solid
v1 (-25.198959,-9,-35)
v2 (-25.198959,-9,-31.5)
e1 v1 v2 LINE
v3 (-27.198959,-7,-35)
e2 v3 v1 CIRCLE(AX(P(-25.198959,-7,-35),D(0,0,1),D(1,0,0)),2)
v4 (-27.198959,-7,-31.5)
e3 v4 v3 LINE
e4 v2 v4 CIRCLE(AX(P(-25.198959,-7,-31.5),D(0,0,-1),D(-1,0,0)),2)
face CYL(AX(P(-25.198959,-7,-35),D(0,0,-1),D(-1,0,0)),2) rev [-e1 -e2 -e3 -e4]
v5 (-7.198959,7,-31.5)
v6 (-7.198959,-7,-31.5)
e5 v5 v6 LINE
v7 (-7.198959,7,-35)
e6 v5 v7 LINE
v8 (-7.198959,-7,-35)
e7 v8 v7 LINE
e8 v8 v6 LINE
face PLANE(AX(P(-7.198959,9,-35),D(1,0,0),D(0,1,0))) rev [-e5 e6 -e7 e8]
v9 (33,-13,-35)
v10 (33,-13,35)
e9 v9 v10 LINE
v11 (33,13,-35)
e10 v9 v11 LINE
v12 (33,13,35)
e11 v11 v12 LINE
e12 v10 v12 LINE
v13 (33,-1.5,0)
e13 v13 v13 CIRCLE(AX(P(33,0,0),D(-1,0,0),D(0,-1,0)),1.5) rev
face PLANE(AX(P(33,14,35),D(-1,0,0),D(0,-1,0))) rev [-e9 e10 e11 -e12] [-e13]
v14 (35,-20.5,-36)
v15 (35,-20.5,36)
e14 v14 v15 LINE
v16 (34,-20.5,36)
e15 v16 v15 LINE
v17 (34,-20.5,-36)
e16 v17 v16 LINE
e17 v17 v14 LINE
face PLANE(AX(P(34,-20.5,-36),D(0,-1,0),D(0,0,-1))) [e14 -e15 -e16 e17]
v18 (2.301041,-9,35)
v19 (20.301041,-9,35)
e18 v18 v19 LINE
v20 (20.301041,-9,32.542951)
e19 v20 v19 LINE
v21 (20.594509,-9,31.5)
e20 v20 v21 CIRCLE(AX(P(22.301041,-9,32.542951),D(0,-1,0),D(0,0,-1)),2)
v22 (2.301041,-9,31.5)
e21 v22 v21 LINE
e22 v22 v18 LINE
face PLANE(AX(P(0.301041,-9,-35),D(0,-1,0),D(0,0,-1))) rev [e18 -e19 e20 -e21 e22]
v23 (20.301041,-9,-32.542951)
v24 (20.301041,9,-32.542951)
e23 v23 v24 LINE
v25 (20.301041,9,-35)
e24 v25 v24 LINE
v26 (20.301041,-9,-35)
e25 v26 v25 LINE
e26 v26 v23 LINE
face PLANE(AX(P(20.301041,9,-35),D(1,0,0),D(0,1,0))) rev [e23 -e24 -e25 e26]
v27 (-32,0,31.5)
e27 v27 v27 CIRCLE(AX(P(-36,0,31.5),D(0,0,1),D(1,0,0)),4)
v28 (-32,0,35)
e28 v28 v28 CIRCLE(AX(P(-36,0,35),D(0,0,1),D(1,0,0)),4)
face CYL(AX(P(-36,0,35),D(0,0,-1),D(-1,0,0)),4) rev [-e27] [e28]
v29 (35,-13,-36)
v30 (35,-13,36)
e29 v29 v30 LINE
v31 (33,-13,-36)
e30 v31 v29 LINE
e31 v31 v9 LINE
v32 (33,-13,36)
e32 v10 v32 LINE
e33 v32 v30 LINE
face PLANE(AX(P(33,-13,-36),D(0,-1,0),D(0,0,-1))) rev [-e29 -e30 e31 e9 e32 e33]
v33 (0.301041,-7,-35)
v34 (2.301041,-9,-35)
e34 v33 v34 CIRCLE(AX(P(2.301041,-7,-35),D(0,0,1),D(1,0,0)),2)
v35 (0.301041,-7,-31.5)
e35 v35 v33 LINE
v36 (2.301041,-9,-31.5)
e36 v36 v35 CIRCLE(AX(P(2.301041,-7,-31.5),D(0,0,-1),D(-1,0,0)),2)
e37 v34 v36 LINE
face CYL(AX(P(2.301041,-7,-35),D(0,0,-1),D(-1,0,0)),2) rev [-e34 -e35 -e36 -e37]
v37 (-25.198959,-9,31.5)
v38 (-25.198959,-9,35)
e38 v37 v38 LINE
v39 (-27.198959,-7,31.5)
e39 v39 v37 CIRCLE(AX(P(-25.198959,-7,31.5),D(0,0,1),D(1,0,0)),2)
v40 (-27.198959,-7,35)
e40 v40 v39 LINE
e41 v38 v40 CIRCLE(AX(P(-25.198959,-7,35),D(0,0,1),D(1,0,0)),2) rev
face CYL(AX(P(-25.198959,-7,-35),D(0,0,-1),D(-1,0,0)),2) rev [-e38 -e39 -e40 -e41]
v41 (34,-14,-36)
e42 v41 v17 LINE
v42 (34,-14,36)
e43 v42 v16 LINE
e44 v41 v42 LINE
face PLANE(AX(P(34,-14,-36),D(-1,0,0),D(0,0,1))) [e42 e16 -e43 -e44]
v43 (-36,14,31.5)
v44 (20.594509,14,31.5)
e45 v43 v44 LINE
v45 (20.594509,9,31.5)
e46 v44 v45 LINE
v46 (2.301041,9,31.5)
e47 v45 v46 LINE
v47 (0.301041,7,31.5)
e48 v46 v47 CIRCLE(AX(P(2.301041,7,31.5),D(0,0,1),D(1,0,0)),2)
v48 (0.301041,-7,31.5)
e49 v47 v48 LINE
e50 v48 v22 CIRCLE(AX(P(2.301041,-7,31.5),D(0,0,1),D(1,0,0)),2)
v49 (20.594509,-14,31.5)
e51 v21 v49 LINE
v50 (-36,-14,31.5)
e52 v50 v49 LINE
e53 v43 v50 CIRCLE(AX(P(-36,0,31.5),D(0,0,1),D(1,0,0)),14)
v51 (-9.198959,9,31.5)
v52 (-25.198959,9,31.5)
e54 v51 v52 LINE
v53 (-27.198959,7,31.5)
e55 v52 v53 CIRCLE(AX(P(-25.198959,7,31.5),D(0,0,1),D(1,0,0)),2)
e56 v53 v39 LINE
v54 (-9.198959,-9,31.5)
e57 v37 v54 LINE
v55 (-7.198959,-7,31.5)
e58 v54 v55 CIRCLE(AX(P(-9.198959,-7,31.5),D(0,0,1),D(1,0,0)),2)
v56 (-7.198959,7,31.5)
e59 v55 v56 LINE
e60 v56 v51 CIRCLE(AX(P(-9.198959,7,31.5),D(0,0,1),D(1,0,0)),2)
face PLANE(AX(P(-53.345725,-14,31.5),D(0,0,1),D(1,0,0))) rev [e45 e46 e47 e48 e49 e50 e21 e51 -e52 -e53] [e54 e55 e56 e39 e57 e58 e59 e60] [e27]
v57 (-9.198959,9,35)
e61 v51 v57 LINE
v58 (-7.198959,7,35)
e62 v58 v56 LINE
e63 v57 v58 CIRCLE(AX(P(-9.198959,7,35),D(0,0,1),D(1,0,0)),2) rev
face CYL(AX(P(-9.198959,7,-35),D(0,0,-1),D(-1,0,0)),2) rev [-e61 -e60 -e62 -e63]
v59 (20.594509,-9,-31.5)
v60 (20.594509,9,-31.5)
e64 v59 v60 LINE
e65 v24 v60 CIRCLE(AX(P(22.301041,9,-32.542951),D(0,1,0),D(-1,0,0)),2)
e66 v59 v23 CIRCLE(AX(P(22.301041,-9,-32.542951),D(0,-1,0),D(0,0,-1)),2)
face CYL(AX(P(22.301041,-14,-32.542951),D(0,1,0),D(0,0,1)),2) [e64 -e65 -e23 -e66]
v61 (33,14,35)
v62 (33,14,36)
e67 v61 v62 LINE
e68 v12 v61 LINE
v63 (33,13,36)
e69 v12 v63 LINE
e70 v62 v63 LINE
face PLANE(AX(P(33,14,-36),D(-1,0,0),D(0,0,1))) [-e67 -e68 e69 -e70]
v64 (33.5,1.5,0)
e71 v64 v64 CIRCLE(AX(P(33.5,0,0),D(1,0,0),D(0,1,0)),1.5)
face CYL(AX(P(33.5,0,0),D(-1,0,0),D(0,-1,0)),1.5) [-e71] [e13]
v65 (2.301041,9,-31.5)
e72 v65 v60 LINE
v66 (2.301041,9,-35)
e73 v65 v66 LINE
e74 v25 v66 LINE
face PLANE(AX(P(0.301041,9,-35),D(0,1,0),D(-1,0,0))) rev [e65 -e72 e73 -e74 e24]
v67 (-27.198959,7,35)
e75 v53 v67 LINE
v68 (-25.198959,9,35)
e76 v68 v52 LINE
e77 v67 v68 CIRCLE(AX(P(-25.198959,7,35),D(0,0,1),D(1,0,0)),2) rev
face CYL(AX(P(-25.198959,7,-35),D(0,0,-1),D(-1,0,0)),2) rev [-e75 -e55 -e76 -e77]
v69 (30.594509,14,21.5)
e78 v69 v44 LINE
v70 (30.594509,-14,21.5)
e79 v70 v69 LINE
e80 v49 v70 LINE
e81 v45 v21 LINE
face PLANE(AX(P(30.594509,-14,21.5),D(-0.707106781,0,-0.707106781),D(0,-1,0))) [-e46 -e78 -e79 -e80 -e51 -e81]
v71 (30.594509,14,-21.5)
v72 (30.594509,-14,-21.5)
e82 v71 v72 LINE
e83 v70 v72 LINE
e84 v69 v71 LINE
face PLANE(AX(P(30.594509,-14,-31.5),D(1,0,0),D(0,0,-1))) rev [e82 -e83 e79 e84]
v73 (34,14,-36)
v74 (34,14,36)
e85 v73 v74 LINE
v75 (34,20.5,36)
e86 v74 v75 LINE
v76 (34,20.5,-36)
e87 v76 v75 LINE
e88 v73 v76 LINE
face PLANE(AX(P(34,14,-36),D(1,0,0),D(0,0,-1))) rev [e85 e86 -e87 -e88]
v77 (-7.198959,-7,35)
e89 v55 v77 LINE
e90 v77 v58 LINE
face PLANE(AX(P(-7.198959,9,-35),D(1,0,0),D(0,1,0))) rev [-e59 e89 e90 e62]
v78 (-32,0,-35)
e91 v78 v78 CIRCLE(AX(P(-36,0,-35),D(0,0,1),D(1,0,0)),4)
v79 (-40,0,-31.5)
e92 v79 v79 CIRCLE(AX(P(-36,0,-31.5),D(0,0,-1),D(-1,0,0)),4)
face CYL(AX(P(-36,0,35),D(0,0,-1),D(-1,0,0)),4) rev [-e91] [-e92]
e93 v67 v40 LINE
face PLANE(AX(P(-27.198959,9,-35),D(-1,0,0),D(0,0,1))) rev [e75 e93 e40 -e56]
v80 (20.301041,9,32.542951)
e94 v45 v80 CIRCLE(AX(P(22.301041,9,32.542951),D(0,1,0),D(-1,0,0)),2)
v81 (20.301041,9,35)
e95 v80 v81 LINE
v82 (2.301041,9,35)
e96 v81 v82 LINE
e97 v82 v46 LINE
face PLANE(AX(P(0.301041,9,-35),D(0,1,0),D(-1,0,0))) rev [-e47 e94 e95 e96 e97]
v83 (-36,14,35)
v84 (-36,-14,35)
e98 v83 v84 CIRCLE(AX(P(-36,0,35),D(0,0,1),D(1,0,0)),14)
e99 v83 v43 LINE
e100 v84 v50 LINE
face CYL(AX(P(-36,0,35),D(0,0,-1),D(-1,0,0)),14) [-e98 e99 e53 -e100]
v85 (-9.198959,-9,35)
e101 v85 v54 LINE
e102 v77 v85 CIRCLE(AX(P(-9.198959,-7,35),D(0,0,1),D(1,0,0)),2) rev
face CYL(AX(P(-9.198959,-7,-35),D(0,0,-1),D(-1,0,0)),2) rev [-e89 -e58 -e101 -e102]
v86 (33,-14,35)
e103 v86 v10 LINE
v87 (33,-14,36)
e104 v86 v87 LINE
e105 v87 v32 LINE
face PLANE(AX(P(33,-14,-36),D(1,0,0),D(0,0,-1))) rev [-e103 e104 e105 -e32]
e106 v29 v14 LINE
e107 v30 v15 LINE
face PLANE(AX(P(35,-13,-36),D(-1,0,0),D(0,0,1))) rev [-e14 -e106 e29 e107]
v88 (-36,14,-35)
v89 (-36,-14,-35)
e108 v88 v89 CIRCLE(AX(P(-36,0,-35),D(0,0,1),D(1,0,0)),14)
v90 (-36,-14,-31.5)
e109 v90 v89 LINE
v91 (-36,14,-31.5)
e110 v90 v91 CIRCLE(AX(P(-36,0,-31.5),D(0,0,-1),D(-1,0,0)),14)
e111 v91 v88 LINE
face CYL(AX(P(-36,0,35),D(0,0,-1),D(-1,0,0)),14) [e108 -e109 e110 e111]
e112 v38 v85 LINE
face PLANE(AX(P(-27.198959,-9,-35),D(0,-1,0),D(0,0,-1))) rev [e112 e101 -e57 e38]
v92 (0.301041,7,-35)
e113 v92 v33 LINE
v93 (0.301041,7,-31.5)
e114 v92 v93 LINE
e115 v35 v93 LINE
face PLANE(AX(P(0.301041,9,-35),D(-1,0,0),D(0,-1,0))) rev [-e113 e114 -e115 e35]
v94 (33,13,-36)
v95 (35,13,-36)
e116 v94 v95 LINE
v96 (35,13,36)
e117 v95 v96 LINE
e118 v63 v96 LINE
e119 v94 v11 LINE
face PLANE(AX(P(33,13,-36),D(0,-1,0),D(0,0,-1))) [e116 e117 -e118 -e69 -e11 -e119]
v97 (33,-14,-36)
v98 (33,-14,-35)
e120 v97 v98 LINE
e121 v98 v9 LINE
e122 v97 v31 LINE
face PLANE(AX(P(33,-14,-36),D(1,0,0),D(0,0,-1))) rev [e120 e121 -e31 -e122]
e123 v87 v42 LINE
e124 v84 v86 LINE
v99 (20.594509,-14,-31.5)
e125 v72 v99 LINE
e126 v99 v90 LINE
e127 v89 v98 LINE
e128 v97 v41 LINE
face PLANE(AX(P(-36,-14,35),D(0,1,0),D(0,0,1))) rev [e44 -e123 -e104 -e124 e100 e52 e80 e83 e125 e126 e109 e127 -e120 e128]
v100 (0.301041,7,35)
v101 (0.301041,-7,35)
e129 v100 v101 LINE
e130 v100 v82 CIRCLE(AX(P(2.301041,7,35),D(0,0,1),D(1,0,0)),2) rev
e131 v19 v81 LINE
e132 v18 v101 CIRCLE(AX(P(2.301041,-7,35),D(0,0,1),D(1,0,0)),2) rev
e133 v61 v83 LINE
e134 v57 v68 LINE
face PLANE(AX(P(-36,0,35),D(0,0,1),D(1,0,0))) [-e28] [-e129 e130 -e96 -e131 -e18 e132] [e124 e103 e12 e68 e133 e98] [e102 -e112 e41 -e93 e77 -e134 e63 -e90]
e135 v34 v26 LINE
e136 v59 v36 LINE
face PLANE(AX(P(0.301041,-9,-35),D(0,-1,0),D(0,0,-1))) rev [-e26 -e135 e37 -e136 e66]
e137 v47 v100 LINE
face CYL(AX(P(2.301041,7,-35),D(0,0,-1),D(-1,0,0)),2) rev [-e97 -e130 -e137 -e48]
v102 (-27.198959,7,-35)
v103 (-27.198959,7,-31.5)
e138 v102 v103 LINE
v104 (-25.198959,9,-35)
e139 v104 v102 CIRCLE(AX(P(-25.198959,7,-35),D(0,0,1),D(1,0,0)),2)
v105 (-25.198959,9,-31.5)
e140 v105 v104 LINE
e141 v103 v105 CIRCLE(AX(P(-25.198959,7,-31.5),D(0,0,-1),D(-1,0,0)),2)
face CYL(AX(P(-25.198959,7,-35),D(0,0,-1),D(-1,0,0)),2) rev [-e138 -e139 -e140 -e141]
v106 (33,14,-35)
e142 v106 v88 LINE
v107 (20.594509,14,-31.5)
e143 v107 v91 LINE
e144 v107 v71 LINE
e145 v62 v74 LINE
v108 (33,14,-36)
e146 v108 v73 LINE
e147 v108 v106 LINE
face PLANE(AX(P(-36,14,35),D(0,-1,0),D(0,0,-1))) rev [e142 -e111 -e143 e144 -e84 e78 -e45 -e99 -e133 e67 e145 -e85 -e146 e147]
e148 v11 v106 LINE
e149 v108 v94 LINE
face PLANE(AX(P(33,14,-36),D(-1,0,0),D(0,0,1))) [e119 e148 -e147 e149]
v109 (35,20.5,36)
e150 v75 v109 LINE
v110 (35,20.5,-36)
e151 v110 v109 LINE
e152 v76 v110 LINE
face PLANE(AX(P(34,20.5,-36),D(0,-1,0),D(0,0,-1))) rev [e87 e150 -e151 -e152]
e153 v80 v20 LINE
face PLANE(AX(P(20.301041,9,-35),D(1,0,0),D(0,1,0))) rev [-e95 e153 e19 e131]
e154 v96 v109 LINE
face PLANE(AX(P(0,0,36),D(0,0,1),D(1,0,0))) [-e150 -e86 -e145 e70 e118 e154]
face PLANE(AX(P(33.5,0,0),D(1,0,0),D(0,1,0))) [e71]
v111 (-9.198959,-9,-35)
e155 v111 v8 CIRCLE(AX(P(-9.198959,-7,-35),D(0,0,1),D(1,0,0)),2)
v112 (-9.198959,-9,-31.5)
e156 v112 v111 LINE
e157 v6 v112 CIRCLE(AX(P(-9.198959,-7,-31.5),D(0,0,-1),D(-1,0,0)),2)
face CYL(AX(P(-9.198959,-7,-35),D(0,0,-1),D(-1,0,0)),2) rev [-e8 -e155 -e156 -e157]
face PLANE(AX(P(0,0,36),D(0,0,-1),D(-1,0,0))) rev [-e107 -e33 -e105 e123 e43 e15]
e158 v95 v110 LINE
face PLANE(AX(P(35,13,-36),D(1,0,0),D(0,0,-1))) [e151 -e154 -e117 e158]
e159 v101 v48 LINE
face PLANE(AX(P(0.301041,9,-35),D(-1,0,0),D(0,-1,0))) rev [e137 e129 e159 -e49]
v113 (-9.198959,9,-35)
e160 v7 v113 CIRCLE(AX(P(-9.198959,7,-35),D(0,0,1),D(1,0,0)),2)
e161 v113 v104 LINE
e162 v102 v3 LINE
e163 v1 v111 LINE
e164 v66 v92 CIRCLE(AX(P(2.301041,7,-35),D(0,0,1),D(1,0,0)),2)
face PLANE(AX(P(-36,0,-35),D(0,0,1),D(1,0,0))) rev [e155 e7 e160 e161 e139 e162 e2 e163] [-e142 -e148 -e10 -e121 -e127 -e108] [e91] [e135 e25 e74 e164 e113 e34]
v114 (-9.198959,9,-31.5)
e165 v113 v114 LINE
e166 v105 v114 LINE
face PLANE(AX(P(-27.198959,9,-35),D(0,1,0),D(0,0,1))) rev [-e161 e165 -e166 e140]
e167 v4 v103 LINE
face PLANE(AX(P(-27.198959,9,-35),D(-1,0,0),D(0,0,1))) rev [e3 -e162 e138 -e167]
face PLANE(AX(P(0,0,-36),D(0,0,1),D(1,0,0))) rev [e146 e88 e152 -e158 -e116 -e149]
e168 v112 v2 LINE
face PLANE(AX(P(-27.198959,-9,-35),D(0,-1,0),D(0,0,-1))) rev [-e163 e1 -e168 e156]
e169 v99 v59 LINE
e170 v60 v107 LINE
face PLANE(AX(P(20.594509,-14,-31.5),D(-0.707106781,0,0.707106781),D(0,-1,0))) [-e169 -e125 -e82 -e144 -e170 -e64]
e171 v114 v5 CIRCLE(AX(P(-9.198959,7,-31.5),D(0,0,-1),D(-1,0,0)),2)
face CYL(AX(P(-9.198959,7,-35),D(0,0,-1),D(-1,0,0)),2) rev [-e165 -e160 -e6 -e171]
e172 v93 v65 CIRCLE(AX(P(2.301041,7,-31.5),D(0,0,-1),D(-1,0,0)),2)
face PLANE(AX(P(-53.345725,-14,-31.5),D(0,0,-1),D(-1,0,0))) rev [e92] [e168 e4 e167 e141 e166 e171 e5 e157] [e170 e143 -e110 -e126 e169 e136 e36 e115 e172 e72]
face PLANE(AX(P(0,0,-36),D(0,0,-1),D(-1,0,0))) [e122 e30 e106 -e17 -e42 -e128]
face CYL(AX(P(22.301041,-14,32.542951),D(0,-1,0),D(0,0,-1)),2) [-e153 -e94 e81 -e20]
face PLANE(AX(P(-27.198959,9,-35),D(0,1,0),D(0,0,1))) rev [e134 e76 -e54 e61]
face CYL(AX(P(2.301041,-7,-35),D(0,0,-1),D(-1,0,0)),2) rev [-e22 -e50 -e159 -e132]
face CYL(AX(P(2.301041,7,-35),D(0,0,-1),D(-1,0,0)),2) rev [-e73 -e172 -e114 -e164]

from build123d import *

# Parameters (mm, degrees)
SKETCH1_R           = 4
BOSS_EXTRUDE1_DEPTH = 35
SKETCH3_W           = 44.253465858
SKETCH3_H           = 32.381458222
CUT_EXTRUDE1_DEPTH  = 27.5
SKETCH4_W           = 83.940233782
SKETCH4_H           = 63
CUT_EXTRUDE2_DEPTH  = 68.149087857
CHAMFER1_SIZE       = 10
SKETCH7_W           = 20
SKETCH7_H           = 18
CUT_EXTRUDE3_DEPTH  = 88.155034278
FILLET2_R           = 2
BOSS_EXTRUDE4_START = 1
BOSS_EXTRUDE4_DEPTH = 72
SKETCH11_R          = 1.5
BOSS_EXTRUDE5_DEPTH = 0.5


with BuildPart() as part:
    # Sketch1 → Boss-Extrude1 (new, symmetric)
    with BuildSketch(Plane.XY):
        with BuildLine():
            Line((-36, 14), (33, 14))
            Line((33, 14), (33, -14))
            Line((33, -14), (-36, -14))
            ThreePointArc((-36, -14), (-50, 0), (-36, 14))
        make_face()
        with Locations((-36, 0)):
            Circle(SKETCH1_R, mode=Mode.SUBTRACT)
    extrude(amount=BOSS_EXTRUDE1_DEPTH, both=True)

    # Sketch3 → Cut-Extrude1 (cut, symmetric)
    with BuildSketch(Plane.XY):
        with Locations((-36, 0)):
            Rectangle(SKETCH3_W, SKETCH3_H)
    extrude(amount=CUT_EXTRUDE1_DEPTH, both=True, mode=Mode.SUBTRACT)

    # Sketch4 → Cut-Extrude2 (cut, through all)
    with BuildSketch(Plane(origin=(0, 14, 0), x_dir=(1, 0, 0), z_dir=(0, 1, 0))):
        with Locations((-11.375607931, 0)):
            Rectangle(SKETCH4_W, SKETCH4_H)
    extrude(amount=-CUT_EXTRUDE2_DEPTH, mode=Mode.SUBTRACT)

    # Chamfer1
    chamfer1_edges = [part.edges().sort_by_distance(p)[0] for p in [
        (30.59450896, 0, 31.5),
        (30.59450896, 0, -31.5),
    ]]
    chamfer(chamfer1_edges, length=CHAMFER1_SIZE)

    # Sketch7 → Cut-Extrude3 (cut, through all)
    with BuildSketch(Plane.XY.offset(35)):
        with Locations((-17.198958596, 0)):
            Rectangle(SKETCH7_W, SKETCH7_H)
        with Locations((10.301041404, 0)):
            Rectangle(SKETCH7_W, SKETCH7_H)
    extrude(amount=-CUT_EXTRUDE3_DEPTH, mode=Mode.SUBTRACT)

    # Fillet2
    # the kernel refuses this fillet: 2 mm, written as the material it adds along each edge
    with BuildSketch(Plane(origin=(-27.198958596, -9, -31.5), x_dir=(0, 1, 0), z_dir=(0, 0, -1)), Plane(origin=(-7.198958596, 9, -31.5), x_dir=(0, -1, 0), z_dir=(0, 0, -1)), Plane(origin=(-7.198958596, 9, 35), x_dir=(0, -1, 0), z_dir=(0, 0, -1)), Plane(origin=(-7.198958596, -9, -31.5), x_dir=(-1, 0, 0), z_dir=(0, 0, -1)), Plane(origin=(0.301041404, -9, -31.5), x_dir=(0, 1, 0), z_dir=(0, 0, -1))) as fillet2_piece_1:
        with BuildLine():
            CenterArc((FILLET2_R, FILLET2_R), FILLET2_R, 180, 90)
            Line((0, FILLET2_R), (0, 0))
            Line((0, 0), (FILLET2_R, 0))
        make_face()
    extrude(amount=3.5)
    with BuildSketch(Plane(origin=(-27.198958596, -9, 35), x_dir=(1, 0, 0), z_dir=(0, 0, -1)), Plane(origin=(-27.198958596, 9, -31.5), x_dir=(0, -1, 0), z_dir=(0, 0, -1)), Plane(origin=(-27.198958596, 9, 35), x_dir=(0, -1, 0), z_dir=(0, 0, -1)), Plane(origin=(-7.198958596, -9, 35), x_dir=(0, 1, 0), z_dir=(0, 0, -1)), Plane(origin=(0.301041404, -9, 35), x_dir=(1, 0, 0), z_dir=(0, 0, -1)), Plane(origin=(0.301041404, 9, -31.5), x_dir=(0, -1, 0), z_dir=(0, 0, -1)), Plane(origin=(0.301041404, 9, 35), x_dir=(0, -1, 0), z_dir=(0, 0, -1))) as fillet2_piece_2:
        with BuildLine():
            CenterArc((FILLET2_R, -FILLET2_R), FILLET2_R, 90, 90)
            Line((0, -FILLET2_R), (0, 0))
            Line((0, 0), (FILLET2_R, 0))
        make_face()
    extrude(amount=3.5)
    # the kernel refuses this fillet: 2 mm, written as the material it takes off along each edge
    with BuildSketch(Plane(origin=(20.301041404, 9, -31.5), x_dir=(1, 0, 0), z_dir=(0, -1, 0)), Plane(origin=(20.301041404, -9, 31.5), x_dir=(1, 0, 0), z_dir=(0, 1, 0))) as fillet2_2_piece_1:
        with BuildLine():
            CenterArc((2, -1.042951109), FILLET2_R, 148.568719088, 31.431280912)
            Line((0, -1.042951109), (0, 0))
            Line((0, 0), (0.293467555, 0))
        make_face()
    extrude(amount=18, mode=Mode.SUBTRACT)

    # Sketch10 → Boss-Extrude4 (add)
    with BuildSketch(Plane.XY.offset(35).offset(BOSS_EXTRUDE4_START)):
        Polygon((33, 14), (34, 14), (34, 20.5), (35, 20.5), (35, 13), (33, 13), align=None)
        Polygon((33, -14), (33, -13), (35, -13), (35, -20.5), (34, -20.5), (34, -14), align=None)
    extrude(amount=-BOSS_EXTRUDE4_DEPTH)

    # Sketch11 → Boss-Extrude5 (add)
    with BuildSketch(Plane(origin=(33, 0, 0), x_dir=(0, 0, -1), z_dir=(1, 0, 0))):
        with Locations(Location((0, 0, 0), (0, 0, 270))):
            Circle(SKETCH11_R)
    extrude(amount=BOSS_EXTRUDE5_DEPTH)


solid = part.part
